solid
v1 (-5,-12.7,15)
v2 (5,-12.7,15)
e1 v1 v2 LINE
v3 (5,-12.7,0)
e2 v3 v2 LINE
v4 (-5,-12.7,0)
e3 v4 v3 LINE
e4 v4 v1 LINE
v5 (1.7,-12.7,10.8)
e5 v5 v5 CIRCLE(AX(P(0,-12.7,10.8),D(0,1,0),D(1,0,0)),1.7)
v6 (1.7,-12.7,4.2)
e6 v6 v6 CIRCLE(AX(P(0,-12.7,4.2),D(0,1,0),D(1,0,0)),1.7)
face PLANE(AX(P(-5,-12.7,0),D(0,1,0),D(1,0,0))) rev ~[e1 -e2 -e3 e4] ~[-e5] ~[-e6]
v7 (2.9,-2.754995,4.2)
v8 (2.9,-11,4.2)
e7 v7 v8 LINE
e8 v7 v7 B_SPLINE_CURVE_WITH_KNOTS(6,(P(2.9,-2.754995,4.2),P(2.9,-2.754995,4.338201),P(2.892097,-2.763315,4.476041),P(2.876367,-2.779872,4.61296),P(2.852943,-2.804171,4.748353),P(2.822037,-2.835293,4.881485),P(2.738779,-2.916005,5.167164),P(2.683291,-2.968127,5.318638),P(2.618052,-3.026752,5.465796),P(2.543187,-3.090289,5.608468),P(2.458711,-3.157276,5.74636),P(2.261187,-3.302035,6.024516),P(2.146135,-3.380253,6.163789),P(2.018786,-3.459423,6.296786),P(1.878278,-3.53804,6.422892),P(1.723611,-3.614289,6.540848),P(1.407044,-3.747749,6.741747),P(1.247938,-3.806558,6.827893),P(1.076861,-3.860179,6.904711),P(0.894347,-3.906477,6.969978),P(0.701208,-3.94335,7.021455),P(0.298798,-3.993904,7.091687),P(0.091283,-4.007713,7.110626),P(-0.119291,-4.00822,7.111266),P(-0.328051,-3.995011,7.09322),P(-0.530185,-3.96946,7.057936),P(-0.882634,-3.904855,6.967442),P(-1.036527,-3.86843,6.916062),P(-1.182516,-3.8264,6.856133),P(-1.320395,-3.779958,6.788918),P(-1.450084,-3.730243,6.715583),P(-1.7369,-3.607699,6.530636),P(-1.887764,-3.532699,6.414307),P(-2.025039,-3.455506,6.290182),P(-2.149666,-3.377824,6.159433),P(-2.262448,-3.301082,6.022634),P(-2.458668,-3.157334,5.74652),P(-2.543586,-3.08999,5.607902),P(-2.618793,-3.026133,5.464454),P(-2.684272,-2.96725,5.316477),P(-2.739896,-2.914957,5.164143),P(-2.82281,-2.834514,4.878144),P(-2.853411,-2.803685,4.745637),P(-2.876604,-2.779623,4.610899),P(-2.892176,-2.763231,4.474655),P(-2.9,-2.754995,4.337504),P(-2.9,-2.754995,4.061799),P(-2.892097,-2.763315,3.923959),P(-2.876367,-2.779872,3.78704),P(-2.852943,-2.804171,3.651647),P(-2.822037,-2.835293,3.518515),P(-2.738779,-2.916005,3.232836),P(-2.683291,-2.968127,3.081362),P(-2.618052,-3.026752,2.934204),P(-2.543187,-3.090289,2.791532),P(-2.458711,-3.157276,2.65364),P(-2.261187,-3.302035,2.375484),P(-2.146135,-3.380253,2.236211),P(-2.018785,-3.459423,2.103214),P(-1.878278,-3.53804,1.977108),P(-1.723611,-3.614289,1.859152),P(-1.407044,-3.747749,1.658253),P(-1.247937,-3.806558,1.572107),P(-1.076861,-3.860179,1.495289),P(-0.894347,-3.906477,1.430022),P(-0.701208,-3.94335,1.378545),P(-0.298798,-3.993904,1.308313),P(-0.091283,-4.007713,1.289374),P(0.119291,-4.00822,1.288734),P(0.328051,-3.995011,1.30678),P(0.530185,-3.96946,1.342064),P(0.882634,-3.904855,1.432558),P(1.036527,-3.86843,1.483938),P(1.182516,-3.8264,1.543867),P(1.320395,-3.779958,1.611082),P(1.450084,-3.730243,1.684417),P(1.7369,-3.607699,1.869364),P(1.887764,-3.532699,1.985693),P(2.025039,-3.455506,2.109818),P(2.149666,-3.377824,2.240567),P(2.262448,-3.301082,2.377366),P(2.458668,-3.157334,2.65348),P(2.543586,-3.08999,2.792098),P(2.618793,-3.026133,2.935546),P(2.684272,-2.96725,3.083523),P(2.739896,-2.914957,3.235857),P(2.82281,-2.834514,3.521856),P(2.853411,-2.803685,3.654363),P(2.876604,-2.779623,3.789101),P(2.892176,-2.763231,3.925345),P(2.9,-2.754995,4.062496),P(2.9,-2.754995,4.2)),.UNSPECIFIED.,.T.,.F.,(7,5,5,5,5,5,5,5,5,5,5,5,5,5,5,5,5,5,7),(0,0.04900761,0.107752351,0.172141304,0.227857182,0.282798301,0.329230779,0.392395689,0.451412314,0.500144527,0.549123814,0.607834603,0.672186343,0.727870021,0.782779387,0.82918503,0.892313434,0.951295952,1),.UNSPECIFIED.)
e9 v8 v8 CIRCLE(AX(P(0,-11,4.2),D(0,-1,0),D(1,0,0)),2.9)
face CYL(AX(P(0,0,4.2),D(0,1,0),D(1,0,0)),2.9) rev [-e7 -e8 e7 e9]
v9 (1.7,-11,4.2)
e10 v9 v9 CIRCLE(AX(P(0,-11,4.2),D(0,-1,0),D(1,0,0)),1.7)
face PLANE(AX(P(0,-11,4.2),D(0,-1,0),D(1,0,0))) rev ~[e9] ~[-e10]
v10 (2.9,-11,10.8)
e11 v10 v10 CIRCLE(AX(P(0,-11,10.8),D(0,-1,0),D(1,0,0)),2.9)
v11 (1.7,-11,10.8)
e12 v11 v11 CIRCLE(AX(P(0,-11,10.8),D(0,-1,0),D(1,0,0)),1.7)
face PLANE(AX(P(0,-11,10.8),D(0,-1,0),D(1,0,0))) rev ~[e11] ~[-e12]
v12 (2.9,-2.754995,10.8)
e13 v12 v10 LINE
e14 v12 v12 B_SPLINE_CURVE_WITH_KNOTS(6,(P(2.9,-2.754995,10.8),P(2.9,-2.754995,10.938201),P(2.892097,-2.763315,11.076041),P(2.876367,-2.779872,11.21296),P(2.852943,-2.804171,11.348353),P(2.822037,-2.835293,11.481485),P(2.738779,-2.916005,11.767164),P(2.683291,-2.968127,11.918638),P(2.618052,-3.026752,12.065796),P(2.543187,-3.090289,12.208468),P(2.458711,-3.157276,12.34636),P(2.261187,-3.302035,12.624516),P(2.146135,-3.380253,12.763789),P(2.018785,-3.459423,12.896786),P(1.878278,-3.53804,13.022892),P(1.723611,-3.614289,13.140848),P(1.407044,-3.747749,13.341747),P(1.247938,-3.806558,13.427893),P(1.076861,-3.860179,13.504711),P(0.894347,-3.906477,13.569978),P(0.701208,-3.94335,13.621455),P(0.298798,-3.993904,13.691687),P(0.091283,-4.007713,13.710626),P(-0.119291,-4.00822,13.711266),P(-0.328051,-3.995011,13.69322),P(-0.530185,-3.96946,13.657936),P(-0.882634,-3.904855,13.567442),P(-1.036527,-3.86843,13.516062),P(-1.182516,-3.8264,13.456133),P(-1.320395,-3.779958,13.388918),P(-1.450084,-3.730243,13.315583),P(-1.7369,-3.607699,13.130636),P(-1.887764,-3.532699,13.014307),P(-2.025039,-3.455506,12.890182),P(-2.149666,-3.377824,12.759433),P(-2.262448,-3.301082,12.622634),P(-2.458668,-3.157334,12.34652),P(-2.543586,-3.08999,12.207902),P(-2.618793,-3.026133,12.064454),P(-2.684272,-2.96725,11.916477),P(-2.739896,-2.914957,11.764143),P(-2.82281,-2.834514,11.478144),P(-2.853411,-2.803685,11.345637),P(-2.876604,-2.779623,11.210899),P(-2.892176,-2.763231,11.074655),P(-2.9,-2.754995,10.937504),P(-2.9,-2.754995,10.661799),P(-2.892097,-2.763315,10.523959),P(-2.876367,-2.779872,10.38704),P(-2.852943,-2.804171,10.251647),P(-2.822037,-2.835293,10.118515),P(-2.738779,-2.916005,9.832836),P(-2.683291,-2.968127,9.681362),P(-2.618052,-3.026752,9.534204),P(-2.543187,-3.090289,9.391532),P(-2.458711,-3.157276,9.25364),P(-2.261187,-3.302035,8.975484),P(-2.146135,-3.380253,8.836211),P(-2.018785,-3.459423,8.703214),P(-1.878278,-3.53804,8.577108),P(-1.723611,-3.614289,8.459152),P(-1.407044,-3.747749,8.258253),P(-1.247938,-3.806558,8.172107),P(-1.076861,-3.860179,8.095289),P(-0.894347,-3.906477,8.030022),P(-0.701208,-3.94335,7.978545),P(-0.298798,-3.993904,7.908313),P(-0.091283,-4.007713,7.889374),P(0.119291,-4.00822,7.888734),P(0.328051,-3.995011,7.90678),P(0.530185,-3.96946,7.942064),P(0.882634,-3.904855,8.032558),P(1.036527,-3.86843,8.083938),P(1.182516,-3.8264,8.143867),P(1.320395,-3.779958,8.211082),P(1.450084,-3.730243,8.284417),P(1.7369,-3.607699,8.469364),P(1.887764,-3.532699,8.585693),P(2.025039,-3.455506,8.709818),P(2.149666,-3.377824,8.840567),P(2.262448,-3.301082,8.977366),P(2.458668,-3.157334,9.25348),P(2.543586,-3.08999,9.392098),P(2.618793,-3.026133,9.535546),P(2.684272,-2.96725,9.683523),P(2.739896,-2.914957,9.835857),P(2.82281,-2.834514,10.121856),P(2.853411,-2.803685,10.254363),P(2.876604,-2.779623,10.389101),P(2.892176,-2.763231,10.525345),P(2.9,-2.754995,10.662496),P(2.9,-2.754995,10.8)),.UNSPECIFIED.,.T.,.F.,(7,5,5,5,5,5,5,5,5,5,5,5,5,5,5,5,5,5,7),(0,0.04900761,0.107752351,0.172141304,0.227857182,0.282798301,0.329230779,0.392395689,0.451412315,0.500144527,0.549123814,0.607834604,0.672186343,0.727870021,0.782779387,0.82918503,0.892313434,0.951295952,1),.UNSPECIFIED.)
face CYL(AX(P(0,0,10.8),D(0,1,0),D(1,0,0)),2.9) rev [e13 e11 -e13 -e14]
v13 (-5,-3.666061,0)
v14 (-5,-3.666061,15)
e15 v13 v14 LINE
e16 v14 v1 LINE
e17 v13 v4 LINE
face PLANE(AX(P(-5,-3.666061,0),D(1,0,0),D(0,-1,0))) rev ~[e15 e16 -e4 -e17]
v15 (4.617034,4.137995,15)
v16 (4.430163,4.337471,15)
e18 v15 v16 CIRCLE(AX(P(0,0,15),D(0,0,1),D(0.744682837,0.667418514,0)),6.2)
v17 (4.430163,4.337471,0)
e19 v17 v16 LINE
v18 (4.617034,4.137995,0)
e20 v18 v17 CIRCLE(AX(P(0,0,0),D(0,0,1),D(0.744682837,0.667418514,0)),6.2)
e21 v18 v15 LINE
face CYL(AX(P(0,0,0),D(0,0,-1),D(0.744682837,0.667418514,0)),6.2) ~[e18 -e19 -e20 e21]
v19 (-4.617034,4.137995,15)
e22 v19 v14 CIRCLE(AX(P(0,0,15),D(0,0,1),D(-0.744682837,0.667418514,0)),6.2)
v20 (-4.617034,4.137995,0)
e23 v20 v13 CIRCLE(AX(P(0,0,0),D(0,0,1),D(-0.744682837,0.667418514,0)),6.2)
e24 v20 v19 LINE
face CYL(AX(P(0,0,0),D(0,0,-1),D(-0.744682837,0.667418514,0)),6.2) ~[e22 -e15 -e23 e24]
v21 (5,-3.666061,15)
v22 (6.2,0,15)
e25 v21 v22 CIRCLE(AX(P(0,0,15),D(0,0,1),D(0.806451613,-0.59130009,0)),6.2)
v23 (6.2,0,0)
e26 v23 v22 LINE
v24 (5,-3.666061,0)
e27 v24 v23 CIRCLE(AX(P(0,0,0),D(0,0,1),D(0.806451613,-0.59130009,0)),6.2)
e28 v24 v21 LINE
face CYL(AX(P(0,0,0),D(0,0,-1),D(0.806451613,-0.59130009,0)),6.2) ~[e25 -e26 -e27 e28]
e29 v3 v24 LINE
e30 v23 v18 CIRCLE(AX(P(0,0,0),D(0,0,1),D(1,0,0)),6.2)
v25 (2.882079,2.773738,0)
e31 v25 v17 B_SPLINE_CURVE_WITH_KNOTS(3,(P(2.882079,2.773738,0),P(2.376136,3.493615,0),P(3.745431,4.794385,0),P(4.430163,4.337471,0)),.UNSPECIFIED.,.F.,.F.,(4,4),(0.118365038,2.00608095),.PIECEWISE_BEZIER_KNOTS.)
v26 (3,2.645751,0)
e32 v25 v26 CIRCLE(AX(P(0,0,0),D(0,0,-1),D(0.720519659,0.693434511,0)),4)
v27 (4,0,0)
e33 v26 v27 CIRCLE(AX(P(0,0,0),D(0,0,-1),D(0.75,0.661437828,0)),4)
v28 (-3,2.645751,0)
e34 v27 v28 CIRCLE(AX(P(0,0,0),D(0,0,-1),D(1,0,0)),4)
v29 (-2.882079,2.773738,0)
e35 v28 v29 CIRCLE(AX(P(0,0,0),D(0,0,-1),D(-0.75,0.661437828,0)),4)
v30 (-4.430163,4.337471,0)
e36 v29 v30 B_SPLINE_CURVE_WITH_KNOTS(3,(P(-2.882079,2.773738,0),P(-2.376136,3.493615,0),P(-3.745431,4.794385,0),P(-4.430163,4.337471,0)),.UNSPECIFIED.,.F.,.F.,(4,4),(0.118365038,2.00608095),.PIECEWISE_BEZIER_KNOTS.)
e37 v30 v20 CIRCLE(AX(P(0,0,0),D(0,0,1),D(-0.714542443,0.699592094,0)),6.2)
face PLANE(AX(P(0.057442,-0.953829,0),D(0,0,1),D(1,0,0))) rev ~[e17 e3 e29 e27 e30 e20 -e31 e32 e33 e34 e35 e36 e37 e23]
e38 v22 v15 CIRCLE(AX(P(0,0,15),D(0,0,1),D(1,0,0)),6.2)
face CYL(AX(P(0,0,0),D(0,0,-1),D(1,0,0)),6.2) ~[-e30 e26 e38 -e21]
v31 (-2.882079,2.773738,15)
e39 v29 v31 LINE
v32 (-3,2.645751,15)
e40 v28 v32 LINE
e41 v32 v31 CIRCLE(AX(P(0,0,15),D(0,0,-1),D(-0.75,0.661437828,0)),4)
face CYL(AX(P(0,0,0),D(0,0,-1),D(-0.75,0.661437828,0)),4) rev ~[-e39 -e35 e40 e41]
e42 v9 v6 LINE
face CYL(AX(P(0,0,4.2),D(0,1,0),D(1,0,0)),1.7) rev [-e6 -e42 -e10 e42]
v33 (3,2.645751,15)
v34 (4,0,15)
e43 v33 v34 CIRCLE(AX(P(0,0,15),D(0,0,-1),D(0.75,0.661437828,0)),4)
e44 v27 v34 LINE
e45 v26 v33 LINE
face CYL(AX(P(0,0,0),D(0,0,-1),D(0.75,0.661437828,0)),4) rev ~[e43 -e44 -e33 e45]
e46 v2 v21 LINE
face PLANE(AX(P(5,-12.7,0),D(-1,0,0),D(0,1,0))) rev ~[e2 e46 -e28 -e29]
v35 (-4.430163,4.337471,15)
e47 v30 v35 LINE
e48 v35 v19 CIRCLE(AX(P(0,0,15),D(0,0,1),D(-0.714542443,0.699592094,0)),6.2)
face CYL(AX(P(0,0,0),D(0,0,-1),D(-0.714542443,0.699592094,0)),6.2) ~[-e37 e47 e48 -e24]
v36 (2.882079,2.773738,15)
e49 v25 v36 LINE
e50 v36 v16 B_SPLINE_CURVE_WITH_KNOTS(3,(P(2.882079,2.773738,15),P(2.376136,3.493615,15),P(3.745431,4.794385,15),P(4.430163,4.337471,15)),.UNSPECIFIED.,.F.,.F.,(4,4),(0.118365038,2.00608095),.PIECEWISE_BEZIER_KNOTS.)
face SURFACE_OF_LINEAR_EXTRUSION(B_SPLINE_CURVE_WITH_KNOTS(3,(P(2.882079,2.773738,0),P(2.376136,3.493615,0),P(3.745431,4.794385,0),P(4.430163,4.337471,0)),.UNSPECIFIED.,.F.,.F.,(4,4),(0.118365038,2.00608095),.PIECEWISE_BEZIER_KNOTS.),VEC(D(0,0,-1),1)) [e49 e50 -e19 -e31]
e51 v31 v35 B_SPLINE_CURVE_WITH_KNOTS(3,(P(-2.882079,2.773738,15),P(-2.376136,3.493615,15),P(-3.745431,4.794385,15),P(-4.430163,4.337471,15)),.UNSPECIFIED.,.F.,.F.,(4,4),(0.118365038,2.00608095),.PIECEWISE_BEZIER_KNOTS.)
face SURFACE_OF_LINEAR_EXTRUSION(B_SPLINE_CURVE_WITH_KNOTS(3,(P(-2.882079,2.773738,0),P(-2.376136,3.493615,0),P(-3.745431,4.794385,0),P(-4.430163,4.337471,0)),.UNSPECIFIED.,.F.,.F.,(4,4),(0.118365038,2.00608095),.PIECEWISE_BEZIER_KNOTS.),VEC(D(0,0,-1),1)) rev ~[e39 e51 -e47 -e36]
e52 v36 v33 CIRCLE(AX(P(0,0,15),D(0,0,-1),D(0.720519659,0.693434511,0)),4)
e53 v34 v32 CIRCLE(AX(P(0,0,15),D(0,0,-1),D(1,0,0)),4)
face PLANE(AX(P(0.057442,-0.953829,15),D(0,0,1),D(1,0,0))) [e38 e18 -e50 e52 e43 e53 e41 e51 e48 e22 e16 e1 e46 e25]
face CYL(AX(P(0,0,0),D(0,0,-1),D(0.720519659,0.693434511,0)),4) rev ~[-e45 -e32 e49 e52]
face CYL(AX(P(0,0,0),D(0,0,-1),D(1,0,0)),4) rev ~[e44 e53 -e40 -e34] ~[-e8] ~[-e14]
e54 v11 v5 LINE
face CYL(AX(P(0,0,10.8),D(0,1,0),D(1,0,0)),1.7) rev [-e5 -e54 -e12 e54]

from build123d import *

# Parameters (mm, degrees)
F1_DEPTH = 15
F2_R     = 1.7
F3_DEPTH = 25
F2_R_2   = 2.9
F4_DEPTH = 11


# Not quite as in the source:
# - a feature names something its author has since deleted; it is built from what else it names


with BuildPart() as f1:
    # F0 (on Top) → F1 (new body)
    with BuildSketch(Plane.XY):
        with BuildLine():
            ThreePointArc((3, 2.6457513111), (3.7416573868, 1.4142135624), (4, 0))
            ThreePointArc((4, 0), (-1.4142135624, -3.7416573868), (-3, 2.6457513111))
            ThreePointArc((-3, 2.6457513111), (-2.9417354436, 2.7103860574), (-2.8820786357, 2.7737380442))
            add(Edge.make_bspline(
                [(-2.8820786357, 2.7737380442), (-2.3761359585, 3.4936148761), (-3.7454309361, 4.7943850499), (-4.4301631449, 4.3374709808)],
                knots=[0.118365038, 0.118365038, 0.118365038, 0.118365038, 2.0060809504, 2.0060809504, 2.0060809504, 2.0060809504], degree=3))
            ThreePointArc((-4.4301631449, 4.3374709808), (-4.524697766, 4.2387628061), (-4.6170335889, 4.1379947848))
            ThreePointArc((-4.6170335889, 4.1379947848), (-6.1925482399, 0.3038853354), (-5, -3.666060556))
            ThreePointArc((-5, -3.666060556), (0, -6.2), (5, -3.666060556))
            ThreePointArc((5, -3.666060556), (5.8923679451, -1.9287301522), (6.2, 0))
            ThreePointArc((6.2, 0), (5.7907516028, 2.2152191481), (4.6170335889, 4.1379947848))
            ThreePointArc((4.6170335889, 4.1379947848), (4.524697766, 4.2387628061), (4.4301631449, 4.3374709808))
            add(Edge.make_bspline(
                [(2.8820786357, 2.7737380442), (2.3761359585, 3.4936148761), (3.7454309361, 4.7943850499), (4.4301631449, 4.3374709808)],
                knots=[0.118365038, 0.118365038, 0.118365038, 0.118365038, 2.0060809504, 2.0060809504, 2.0060809504, 2.0060809504], degree=3))
            ThreePointArc((2.8820786357, 2.7737380442), (2.9417354436, 2.7103860574), (3, 2.6457513111))
        make_face()
        with BuildLine():
            ThreePointArc((5, -3.666060556), (0, -6.2), (-5, -3.666060556))
            Line((-5, -3.666060556), (-5, -12.7))
            Line((-5, -12.7), (0, -12.7))
            Line((0, -12.7), (5, -12.7))
            Line((5, -12.7), (5, -3.666060556))
        make_face()
    extrude(amount=F1_DEPTH)

    # F2 (on Front) → F3 (cut)
    with BuildSketch(Plane.XZ):
        with Locations((0, 10.8)):
            Circle(F2_R)
        with Locations((3.5e-09, 4.2)):
            Circle(F2_R)
    extrude(amount=F3_DEPTH, mode=Mode.SUBTRACT)

    # F2 (on Front) → F4 (cut)
    with BuildSketch(Plane.XZ):
        with Locations((0, 10.8)):
            Circle(F2_R_2)
        with Locations((0, 10.8)):
            Circle(F2_R, mode=Mode.SUBTRACT)
        with Locations((3.5e-09, 4.2)):
            Circle(F2_R_2)
        with Locations((3.5e-09, 4.2)):
            Circle(F2_R, mode=Mode.SUBTRACT)
    extrude(amount=F4_DEPTH, mode=Mode.SUBTRACT)


solid = f1.part
